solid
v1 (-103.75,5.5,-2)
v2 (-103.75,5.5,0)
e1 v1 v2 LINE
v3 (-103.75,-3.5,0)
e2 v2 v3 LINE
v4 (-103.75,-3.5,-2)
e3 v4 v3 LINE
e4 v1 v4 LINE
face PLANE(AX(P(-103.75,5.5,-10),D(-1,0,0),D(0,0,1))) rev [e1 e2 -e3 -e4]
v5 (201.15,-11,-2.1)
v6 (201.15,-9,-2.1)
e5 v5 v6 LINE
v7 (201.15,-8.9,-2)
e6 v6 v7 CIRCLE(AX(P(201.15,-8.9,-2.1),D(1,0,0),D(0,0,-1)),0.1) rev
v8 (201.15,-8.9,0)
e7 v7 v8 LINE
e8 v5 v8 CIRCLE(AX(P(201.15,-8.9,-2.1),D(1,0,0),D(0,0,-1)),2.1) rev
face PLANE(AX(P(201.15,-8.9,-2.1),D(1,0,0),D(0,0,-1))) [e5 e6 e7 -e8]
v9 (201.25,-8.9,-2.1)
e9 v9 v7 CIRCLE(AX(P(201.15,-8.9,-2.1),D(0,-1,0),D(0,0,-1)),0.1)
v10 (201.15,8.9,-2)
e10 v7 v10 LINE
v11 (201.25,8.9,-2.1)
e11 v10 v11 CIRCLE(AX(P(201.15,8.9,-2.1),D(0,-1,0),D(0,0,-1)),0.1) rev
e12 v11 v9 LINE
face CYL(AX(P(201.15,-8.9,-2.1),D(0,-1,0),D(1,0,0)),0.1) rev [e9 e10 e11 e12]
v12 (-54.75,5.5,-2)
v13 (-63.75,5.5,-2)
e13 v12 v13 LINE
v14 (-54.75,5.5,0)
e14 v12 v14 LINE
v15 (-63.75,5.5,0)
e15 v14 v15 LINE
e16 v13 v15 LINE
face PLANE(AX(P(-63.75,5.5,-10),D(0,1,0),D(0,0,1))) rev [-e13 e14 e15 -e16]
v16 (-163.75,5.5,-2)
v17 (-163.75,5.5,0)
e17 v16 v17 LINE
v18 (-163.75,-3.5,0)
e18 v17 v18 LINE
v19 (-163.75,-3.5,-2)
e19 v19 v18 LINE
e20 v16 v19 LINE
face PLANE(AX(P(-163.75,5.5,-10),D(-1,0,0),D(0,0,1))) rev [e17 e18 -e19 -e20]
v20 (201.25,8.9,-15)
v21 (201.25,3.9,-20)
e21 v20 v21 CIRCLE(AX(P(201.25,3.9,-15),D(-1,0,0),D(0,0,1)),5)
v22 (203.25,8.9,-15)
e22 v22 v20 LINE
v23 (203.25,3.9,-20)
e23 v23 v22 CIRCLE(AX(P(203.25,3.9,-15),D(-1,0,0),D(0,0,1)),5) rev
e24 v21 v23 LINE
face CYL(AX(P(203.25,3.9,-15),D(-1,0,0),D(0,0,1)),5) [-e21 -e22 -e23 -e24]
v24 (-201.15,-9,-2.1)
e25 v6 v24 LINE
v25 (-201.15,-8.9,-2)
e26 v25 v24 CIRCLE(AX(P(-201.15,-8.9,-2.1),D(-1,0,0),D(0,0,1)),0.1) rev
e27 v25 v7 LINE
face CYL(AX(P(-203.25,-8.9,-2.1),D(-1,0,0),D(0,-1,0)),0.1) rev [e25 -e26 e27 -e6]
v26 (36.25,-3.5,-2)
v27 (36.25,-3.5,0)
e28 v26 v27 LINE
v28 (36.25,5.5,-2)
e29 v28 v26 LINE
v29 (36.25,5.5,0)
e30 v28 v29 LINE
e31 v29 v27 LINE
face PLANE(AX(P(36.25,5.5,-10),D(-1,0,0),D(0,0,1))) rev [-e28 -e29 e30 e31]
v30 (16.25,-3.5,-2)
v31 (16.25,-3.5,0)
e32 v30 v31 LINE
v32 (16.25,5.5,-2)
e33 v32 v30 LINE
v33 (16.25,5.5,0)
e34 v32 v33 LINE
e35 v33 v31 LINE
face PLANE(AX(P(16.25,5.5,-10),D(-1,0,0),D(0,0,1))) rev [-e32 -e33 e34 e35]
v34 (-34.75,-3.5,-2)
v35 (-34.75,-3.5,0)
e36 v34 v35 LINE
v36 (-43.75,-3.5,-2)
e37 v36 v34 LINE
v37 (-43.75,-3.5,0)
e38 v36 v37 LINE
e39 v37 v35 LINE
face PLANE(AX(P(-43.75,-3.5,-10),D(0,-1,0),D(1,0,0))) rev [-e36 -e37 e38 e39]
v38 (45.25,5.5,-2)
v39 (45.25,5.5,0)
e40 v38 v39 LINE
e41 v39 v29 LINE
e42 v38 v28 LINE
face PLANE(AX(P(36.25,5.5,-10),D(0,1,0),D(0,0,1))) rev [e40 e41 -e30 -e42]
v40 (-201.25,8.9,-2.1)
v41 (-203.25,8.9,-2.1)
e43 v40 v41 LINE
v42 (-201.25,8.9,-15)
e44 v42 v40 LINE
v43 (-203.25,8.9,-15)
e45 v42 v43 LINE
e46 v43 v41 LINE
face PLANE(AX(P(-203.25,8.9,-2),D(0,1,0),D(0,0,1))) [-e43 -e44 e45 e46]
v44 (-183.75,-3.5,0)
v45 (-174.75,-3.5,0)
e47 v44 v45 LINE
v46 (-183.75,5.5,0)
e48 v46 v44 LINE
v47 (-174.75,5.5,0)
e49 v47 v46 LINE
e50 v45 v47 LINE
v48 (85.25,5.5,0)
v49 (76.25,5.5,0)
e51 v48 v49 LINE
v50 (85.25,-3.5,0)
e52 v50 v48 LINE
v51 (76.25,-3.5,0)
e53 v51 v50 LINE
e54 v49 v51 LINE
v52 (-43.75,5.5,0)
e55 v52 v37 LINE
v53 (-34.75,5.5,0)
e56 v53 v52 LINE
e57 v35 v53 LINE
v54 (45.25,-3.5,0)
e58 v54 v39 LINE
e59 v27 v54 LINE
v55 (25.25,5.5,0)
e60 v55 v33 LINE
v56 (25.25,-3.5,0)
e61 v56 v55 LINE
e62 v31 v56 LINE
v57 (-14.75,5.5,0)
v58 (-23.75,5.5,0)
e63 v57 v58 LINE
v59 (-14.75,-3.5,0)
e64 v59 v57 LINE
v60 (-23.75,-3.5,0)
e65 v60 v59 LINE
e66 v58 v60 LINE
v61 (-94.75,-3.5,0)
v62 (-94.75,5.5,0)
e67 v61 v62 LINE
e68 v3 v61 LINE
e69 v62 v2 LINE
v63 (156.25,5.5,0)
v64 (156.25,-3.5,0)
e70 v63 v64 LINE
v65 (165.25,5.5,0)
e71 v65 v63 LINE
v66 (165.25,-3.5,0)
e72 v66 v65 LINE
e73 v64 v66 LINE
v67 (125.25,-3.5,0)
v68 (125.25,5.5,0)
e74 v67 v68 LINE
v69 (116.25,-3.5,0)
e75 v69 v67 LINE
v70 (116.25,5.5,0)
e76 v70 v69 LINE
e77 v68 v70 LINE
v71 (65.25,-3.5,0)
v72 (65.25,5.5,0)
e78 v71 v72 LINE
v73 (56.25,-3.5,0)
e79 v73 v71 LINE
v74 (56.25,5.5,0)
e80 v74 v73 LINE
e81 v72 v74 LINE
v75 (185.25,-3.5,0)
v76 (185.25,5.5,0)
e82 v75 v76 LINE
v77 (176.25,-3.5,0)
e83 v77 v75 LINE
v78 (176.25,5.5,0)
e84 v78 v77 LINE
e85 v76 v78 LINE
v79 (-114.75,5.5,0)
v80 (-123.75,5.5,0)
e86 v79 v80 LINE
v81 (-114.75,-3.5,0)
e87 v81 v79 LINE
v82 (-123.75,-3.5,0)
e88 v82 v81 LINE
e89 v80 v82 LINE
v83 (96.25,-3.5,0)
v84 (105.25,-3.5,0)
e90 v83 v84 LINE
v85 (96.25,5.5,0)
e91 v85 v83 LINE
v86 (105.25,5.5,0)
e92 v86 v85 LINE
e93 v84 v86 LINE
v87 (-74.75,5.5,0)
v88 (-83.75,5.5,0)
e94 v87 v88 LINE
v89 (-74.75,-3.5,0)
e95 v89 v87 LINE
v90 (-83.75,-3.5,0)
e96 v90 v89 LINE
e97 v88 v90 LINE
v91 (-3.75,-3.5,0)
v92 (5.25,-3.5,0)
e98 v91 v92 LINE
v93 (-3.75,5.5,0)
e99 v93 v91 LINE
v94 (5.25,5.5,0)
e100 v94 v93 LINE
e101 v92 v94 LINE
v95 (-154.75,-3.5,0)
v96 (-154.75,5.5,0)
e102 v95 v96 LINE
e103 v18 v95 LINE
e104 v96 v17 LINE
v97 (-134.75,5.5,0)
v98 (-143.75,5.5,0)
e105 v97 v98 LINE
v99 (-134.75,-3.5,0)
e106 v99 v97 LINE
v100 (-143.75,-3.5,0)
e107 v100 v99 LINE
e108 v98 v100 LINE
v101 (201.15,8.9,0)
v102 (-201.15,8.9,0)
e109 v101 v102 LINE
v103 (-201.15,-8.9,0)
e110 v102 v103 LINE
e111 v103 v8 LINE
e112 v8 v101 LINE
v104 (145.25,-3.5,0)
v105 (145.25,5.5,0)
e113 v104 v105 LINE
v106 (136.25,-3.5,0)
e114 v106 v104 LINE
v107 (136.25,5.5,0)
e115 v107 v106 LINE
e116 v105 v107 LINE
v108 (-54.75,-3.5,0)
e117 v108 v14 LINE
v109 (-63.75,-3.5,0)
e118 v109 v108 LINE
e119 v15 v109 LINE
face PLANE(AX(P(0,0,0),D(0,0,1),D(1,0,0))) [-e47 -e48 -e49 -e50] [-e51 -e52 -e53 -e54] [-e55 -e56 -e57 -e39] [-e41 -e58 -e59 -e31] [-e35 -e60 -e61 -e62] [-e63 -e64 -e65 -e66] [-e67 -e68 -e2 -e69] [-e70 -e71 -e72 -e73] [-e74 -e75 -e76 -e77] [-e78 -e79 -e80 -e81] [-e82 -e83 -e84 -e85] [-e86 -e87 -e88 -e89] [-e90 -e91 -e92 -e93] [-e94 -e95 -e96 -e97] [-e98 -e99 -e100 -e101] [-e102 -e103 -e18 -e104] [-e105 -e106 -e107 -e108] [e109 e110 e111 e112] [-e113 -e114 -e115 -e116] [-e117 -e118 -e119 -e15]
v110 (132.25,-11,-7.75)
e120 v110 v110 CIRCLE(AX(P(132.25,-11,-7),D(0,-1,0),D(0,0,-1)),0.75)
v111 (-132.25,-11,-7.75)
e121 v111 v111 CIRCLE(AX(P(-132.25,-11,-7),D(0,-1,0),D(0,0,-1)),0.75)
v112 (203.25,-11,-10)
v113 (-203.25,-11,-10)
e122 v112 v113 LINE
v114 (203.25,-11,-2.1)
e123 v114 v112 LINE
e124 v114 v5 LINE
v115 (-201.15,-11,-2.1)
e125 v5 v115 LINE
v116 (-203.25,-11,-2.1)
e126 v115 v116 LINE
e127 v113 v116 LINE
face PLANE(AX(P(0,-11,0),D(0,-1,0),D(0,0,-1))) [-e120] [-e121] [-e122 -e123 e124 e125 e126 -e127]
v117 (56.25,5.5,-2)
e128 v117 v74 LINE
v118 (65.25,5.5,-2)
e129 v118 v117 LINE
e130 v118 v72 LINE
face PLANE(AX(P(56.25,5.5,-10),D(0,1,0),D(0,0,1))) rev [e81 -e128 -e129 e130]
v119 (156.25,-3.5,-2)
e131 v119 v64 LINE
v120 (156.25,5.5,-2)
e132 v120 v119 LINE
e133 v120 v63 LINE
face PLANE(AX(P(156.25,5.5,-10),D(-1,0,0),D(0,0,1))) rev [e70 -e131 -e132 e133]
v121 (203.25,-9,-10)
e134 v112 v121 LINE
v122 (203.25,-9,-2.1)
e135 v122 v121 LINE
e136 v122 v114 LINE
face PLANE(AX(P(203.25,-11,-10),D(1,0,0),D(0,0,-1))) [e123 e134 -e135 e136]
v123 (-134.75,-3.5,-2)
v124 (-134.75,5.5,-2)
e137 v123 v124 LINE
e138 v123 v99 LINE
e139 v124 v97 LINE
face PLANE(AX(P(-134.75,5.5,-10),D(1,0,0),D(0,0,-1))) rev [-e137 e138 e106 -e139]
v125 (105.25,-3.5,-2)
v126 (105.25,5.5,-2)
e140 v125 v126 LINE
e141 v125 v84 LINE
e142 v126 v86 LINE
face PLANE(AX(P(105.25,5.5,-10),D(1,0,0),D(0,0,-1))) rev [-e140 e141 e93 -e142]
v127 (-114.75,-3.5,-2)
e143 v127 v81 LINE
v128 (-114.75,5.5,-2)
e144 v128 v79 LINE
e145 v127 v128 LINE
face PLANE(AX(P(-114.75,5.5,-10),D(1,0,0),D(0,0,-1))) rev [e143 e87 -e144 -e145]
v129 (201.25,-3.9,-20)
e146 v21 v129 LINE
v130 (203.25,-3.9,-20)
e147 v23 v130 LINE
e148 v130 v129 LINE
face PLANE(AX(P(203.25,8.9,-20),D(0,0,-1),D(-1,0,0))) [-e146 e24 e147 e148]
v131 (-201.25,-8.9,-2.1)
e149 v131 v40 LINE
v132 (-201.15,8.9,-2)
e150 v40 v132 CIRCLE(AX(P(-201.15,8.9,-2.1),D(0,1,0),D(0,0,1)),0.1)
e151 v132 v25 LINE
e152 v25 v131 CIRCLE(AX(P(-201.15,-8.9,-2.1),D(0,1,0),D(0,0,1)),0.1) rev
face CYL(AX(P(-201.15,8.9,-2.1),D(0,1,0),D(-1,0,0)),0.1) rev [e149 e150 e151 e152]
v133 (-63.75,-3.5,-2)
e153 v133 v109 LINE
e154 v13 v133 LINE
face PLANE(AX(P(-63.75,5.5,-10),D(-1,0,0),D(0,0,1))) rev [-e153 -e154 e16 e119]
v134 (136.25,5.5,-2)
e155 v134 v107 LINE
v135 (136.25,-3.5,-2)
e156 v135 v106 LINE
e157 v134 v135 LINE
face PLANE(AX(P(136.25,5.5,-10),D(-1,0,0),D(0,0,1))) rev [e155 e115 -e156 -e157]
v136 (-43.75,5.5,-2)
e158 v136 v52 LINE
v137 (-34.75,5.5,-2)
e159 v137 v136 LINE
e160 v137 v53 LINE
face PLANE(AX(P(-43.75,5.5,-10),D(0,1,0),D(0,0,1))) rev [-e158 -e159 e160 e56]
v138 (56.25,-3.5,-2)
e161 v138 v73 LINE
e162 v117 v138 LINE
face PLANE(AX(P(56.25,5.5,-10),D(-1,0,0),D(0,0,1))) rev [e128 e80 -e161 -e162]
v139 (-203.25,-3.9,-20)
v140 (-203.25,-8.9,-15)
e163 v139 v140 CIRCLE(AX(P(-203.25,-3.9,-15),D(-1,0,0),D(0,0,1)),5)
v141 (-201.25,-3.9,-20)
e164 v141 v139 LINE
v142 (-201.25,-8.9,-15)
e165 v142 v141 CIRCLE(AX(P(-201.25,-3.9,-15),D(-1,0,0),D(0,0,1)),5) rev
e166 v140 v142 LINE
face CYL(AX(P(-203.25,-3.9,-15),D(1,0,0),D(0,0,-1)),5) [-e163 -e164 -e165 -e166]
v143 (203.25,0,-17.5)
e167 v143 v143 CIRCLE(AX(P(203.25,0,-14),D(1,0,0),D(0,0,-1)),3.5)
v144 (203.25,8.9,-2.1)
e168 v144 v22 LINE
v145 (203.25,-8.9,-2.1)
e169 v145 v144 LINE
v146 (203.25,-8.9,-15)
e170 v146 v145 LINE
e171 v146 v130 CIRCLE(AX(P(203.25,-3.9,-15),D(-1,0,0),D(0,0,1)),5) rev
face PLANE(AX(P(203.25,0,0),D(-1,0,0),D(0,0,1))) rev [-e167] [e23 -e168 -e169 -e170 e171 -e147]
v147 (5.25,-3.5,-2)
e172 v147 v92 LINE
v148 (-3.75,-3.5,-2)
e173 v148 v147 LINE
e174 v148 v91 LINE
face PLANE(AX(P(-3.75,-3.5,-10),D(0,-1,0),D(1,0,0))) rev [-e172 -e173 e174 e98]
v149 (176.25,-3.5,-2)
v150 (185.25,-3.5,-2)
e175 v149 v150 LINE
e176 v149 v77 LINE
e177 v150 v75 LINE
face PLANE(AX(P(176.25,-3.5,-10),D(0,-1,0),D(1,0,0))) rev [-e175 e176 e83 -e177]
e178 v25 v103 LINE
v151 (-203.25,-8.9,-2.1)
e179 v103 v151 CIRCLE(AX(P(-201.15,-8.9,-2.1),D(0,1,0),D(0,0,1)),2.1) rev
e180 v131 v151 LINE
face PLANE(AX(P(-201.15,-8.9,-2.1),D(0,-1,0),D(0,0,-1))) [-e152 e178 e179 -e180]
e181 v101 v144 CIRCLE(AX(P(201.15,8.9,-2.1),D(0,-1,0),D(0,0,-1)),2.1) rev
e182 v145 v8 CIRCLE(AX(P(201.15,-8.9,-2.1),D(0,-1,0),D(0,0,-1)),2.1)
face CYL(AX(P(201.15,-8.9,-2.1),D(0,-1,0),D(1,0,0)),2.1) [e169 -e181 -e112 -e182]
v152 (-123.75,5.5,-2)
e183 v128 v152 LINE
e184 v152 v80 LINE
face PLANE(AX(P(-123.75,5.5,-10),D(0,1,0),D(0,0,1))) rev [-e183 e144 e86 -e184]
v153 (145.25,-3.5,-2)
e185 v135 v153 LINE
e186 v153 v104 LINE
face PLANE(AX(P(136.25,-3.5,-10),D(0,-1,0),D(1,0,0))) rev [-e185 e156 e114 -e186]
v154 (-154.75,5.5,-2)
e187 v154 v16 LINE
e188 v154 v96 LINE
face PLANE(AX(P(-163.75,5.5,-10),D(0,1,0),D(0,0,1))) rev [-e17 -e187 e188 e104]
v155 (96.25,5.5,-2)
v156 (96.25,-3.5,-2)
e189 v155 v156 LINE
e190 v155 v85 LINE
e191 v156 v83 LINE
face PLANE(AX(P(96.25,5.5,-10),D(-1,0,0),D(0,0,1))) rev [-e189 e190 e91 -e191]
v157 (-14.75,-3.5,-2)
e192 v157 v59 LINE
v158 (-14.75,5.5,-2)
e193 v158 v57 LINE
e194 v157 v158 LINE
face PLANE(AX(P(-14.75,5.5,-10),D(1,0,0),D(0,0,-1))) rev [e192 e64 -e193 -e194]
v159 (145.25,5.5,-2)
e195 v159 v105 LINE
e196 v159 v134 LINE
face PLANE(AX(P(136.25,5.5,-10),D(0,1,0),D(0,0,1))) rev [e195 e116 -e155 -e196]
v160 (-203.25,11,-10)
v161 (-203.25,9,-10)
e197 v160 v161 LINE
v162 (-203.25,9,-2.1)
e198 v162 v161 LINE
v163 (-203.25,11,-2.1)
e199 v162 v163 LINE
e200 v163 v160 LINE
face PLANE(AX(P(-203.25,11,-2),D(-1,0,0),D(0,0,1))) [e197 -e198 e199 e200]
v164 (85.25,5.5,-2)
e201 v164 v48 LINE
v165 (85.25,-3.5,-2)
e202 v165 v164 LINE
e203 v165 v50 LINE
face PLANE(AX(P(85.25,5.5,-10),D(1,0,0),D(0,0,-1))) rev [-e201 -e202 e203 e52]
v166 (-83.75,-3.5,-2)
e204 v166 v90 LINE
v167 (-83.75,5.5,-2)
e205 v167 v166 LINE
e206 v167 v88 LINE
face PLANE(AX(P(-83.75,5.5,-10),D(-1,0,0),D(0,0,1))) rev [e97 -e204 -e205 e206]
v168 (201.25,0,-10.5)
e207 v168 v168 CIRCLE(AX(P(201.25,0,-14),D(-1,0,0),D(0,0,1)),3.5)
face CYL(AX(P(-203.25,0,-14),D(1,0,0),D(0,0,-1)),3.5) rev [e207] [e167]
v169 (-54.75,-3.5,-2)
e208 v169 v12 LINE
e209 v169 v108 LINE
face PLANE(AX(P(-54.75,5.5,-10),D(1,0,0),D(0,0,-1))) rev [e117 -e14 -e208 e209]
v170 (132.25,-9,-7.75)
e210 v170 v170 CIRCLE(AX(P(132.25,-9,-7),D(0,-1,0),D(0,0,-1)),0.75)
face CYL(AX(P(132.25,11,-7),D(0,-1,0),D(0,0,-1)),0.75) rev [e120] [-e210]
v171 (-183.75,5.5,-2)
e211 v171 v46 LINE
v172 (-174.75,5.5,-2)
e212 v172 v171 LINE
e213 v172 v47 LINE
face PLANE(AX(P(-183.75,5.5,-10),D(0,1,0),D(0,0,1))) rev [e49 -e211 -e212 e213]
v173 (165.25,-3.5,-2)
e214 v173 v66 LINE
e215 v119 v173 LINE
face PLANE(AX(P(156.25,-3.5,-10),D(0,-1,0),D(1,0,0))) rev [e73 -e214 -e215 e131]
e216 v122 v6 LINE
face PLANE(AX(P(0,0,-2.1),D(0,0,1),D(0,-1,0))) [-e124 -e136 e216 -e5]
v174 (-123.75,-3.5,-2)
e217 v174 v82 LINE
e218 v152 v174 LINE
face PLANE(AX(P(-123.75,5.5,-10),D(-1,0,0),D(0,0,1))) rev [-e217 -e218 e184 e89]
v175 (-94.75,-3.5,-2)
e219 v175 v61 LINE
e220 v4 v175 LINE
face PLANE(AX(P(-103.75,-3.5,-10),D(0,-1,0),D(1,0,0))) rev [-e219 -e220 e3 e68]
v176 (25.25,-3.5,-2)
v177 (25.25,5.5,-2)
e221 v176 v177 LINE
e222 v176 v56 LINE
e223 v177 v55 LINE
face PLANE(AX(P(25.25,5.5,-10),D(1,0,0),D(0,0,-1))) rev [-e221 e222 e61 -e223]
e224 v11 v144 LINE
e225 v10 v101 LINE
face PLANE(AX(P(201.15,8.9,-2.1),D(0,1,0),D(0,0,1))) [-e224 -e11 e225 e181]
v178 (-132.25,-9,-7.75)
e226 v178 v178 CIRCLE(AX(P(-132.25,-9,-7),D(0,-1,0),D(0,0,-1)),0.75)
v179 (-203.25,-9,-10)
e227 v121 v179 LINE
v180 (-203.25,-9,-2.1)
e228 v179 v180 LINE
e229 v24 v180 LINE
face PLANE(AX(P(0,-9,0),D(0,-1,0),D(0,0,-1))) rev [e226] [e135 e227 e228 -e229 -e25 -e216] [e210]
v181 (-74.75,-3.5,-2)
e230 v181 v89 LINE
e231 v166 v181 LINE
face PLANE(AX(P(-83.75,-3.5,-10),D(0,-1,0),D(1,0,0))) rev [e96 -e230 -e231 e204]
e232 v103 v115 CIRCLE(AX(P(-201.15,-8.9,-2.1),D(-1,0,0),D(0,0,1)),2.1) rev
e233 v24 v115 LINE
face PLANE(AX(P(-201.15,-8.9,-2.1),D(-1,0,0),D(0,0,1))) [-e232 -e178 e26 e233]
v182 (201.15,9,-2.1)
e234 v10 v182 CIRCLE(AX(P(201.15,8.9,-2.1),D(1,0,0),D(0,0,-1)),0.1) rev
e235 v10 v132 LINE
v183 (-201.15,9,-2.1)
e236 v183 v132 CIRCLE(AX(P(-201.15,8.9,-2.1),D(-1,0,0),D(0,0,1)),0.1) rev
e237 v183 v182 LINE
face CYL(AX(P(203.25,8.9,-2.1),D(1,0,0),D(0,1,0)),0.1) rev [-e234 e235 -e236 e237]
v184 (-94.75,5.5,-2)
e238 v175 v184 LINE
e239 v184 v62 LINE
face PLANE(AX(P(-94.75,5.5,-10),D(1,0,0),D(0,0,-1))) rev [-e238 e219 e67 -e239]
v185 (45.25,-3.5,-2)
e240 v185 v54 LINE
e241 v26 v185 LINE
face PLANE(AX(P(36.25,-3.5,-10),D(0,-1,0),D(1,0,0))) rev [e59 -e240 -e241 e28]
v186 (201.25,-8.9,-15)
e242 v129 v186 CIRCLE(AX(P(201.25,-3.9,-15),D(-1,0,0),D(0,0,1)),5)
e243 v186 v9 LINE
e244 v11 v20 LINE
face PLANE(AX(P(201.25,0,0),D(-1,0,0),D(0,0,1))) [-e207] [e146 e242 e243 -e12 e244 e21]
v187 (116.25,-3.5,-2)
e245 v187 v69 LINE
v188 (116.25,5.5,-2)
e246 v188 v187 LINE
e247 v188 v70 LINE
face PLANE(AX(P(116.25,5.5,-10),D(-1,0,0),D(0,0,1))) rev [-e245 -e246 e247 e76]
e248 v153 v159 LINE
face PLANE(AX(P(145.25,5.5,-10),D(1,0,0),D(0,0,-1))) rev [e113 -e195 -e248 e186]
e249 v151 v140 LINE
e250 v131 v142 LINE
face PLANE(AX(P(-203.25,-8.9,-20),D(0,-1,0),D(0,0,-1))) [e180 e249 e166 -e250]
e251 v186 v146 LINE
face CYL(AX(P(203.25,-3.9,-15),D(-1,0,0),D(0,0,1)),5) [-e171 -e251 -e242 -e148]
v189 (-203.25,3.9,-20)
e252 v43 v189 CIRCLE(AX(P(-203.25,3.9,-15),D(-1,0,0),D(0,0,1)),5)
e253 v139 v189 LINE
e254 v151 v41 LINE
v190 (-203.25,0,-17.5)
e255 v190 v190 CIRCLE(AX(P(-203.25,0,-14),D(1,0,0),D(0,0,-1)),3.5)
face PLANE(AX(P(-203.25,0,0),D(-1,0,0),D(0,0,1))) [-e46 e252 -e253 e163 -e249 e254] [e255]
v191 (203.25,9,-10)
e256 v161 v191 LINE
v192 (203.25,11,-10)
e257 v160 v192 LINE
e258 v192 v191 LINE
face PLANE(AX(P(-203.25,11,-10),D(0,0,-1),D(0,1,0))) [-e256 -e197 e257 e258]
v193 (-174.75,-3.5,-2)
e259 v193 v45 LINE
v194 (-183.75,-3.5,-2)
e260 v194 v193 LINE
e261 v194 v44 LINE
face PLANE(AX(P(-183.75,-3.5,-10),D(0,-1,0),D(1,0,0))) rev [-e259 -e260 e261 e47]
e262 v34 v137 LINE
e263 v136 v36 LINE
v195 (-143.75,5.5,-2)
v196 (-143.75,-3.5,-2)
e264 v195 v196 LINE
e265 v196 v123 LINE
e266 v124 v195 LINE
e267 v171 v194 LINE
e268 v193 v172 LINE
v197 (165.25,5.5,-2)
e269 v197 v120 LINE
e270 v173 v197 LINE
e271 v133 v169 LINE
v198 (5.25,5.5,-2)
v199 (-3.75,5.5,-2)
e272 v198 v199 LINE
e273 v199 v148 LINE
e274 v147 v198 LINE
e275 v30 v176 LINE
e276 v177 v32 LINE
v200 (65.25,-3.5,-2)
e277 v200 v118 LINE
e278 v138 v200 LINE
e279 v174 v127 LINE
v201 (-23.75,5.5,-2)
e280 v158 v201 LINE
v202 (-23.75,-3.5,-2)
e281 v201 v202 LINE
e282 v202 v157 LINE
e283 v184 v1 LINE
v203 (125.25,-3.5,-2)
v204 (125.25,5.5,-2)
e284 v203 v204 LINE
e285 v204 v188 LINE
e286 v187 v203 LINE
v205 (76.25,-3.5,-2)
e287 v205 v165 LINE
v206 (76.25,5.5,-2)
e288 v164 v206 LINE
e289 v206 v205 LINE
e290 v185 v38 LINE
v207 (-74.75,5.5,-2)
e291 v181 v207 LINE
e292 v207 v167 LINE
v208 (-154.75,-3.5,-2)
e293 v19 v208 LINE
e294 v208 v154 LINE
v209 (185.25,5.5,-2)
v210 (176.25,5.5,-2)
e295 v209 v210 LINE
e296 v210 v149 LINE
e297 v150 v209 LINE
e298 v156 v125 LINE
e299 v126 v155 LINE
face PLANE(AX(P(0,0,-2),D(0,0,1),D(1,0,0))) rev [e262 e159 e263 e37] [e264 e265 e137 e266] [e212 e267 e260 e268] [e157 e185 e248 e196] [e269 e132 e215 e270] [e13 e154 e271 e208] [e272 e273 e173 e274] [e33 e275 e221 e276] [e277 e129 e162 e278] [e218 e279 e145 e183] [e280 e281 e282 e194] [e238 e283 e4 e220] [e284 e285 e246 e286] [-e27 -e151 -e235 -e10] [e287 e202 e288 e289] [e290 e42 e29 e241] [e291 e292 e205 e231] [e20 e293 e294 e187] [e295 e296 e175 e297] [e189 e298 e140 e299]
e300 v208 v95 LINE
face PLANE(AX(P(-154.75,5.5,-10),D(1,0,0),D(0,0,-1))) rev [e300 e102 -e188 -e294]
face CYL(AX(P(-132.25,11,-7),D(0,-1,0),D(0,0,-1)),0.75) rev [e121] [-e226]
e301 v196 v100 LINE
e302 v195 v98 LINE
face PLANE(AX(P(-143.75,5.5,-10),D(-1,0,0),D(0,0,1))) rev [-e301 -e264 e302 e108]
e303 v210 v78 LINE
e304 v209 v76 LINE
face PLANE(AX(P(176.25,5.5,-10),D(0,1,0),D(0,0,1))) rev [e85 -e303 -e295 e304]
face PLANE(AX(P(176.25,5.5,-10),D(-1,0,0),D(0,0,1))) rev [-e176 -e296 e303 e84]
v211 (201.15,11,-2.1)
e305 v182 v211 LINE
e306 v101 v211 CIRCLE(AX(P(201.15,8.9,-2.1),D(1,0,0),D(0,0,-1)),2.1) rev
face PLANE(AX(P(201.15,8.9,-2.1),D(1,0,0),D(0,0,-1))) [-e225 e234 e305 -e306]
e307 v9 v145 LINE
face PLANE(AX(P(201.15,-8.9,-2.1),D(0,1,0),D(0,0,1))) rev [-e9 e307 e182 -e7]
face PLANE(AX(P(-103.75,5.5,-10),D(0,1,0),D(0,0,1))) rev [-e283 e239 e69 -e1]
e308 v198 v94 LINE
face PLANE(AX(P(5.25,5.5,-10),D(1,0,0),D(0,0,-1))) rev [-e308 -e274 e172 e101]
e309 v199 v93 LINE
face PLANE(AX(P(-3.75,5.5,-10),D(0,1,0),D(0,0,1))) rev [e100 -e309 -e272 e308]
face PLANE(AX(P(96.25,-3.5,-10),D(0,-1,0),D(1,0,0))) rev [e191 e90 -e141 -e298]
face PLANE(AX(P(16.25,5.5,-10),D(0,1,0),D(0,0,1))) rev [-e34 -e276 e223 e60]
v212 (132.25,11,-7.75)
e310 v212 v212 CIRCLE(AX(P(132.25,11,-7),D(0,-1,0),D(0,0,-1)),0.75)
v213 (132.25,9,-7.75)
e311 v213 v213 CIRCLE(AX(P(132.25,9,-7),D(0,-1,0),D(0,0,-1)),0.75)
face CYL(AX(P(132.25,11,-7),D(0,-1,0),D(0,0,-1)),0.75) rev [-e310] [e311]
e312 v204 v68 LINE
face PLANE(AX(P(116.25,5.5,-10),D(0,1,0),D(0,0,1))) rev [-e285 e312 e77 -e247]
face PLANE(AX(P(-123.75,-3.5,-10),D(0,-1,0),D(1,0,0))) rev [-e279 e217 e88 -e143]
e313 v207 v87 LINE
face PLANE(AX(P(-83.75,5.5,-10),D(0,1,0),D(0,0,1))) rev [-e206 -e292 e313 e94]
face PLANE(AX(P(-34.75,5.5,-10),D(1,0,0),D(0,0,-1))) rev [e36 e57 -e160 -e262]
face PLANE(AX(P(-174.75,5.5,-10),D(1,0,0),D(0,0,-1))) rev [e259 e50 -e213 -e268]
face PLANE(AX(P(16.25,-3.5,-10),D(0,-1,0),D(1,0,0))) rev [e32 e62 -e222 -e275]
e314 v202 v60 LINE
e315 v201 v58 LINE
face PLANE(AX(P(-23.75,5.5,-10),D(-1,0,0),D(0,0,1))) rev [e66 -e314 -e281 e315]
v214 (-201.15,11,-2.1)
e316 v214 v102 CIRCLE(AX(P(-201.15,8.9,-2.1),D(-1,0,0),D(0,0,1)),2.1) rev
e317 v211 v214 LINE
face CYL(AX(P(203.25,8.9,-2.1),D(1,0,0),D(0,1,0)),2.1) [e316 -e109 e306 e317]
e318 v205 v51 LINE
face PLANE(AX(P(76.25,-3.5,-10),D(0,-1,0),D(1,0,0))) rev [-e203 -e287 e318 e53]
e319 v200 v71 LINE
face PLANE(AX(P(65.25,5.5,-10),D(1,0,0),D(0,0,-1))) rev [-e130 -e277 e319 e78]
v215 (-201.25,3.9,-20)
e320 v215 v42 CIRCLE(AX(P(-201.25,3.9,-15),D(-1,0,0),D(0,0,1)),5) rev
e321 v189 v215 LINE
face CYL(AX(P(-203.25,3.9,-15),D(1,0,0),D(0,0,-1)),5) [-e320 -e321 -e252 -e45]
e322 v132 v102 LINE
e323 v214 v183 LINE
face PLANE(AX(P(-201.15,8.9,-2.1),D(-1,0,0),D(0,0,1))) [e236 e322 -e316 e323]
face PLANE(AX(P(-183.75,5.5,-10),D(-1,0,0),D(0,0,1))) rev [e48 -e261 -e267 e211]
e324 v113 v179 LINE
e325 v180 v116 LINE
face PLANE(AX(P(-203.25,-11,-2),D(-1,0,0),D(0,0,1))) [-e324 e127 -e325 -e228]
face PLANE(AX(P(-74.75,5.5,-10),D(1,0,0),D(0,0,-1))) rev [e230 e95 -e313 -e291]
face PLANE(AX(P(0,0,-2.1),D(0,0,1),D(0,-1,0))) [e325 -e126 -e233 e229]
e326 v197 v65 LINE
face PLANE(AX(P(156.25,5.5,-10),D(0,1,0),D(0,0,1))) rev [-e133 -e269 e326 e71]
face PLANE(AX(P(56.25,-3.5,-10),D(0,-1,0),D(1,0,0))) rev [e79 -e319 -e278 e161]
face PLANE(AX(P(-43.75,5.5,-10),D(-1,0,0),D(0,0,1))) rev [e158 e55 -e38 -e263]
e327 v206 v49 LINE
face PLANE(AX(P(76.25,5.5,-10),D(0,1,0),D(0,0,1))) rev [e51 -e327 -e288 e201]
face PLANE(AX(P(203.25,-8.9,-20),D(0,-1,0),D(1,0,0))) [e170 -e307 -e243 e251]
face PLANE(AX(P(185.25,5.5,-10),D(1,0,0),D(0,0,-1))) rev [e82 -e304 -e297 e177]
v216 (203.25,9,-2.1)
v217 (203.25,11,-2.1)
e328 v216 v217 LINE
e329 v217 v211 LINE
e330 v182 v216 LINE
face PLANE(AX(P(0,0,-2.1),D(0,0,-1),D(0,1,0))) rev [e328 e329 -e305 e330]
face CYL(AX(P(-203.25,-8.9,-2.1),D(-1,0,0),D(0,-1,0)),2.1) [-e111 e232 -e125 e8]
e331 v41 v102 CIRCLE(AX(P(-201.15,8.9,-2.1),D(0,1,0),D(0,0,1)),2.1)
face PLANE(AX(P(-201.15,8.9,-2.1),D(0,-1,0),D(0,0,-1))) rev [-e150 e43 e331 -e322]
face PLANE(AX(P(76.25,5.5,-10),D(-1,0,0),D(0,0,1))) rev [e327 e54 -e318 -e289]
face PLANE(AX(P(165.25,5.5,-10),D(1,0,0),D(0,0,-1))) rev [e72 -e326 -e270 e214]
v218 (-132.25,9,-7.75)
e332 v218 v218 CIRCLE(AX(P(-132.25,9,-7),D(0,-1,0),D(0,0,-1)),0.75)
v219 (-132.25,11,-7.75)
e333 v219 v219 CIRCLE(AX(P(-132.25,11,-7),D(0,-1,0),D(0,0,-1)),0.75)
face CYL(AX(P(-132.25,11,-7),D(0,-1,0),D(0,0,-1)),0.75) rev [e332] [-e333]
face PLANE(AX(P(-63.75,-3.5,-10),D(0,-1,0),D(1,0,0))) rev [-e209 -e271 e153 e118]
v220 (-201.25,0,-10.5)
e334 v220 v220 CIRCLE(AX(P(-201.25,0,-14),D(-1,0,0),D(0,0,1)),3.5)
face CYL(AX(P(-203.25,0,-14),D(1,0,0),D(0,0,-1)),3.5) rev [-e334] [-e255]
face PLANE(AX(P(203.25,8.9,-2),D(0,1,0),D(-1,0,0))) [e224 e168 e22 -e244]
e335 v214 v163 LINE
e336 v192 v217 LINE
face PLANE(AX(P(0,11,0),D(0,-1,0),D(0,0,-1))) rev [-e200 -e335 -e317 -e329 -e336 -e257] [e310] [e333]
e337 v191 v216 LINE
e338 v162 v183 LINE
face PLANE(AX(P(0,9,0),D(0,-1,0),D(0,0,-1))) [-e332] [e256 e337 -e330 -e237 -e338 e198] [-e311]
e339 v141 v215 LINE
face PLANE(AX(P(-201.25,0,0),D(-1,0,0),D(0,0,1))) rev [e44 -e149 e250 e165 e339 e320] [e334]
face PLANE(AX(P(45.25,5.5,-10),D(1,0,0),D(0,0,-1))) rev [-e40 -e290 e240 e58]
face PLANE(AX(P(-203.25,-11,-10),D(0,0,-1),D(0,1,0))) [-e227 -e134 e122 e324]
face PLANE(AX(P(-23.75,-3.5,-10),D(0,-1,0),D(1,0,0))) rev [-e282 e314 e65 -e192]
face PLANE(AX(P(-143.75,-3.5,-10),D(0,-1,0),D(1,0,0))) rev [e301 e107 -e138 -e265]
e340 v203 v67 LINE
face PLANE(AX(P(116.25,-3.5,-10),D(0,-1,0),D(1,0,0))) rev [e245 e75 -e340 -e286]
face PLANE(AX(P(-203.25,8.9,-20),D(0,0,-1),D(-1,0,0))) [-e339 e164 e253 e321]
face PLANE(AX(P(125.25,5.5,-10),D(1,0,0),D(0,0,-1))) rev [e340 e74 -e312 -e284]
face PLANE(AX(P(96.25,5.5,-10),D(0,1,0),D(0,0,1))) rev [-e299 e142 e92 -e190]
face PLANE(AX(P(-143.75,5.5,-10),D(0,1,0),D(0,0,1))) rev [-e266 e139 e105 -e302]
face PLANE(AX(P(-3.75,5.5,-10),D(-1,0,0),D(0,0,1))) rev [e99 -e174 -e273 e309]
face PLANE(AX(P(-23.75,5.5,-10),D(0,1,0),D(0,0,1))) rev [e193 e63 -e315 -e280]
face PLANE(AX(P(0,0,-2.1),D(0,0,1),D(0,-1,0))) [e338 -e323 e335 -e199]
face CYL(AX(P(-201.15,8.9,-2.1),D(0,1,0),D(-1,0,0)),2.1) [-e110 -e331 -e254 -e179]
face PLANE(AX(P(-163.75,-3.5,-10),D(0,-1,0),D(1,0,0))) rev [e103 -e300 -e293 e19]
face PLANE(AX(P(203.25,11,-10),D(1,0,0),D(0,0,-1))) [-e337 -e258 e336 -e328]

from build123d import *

# Parameters (mm, degrees)
SKETCH_1_W                         = 406.5
SKETCH_1_H                         = 22
SM_BASE_FLANGE_1_DEPTH             = 2
SM_EDGE_FLANGE_1_STRIP_W           = 8.2
SM_EDGE_FLANGE_1_STRIP_H           = 2
SM_EDGE_FLANGE_1_STRIP_CUT_DEPTH   = 406.5
SM_EDGE_FLANGE_1_STRIP_2_W         = 8.2
SM_EDGE_FLANGE_1_STRIP_2_H         = 2
SM_EDGE_FLANGE_1_STRIP_CUT_2_DEPTH = 406.5
SM_EDGE_FLANGE_1_DEPTH             = 406.5
SM_EDGE_FLANGE_1_BEND_DEPTH        = 406.5
SM_START                           = -11
SM_EDGE_FLANGE_2_DEPTH             = 22
SM_EDGE_FLANGE_2_2_DEPTH           = 2.1
SM_START_2                         = 8.9
SM_EDGE_FLANGE_2_3_DEPTH           = 2.1
SM_START_3                         = -8.9
SM_EDGE_FLANGE_2_4_DEPTH           = 17.8
SKETCH_18_W                        = 9
SKETCH_18_H                        = 9
CUT_EXTRUDE_1_DEPTH                = 10
PATTERN_LINEAR_1_COUNT             = 19
PATTERN_LINEAR_1_PITCH             = 20
FILLET_1_R                         = 5
SKETCH_19_R                        = 3.5
CUT_EXTRUDE_2_DEPTH                = 408.140332072
CUT_EXTRUDE_3_DEPTH                = 206.413150747
CUT_EXTRUDE_3_DEPTH_BACK           = 206.413150747
SKETCH_20_R                        = 0.75


# Read off the part's stored shape, not the designer's step: 边线-法兰2
# Sheet-metal steps are written as plain solids
with BuildPart() as part:
    # Sketch 1 → 基体-法兰1 (new body)
    with BuildSketch(Plane.XY):
        Rectangle(SKETCH_1_W, SKETCH_1_H)
    extrude(amount=-SM_BASE_FLANGE_1_DEPTH)

    # 边线-法兰1 strip (across the edge) → 边线-法兰1 strip cut (cut)
    with BuildSketch(Plane(origin=(203.25, -11, -2), x_dir=(0, 1, 0), z_dir=(-1, 0, 0))):
        with Locations((-2, -1)):
            Rectangle(SM_EDGE_FLANGE_1_STRIP_W, SM_EDGE_FLANGE_1_STRIP_H)
    extrude(amount=SM_EDGE_FLANGE_1_STRIP_CUT_DEPTH, mode=Mode.SUBTRACT)

    # 边线-法兰1 strip 2 (across the edge) → 边线-法兰1 strip cut 2 (cut)
    with BuildSketch(Plane(origin=(-203.25, 11, -2), x_dir=(0, -1, 0), z_dir=(1, 0, 0))):
        with Locations((-2, -1)):
            Rectangle(SM_EDGE_FLANGE_1_STRIP_2_W, SM_EDGE_FLANGE_1_STRIP_2_H)
    extrude(amount=SM_EDGE_FLANGE_1_STRIP_CUT_2_DEPTH, mode=Mode.SUBTRACT)

    # 边线-法兰1 section (across the edge) → 边线-法兰1 (add)
    with BuildSketch(Plane(origin=(203.25, -11, -2), x_dir=(0, 1, 0), z_dir=(-1, 0, 0))):
        with BuildLine():
            Line((0, 0.1), (0, 8))
            Line((0, 8), (2, 8))
            Line((2, 8), (2, 0.1))
            ThreePointArc((2, 0.1), (2.029289322, 0.029289322), (2.1, 0))
            Line((2.1, 0), (2.1, -2))
            ThreePointArc((2.1, -2), (0.61507576, -1.38492424), (0, 0.1))
        make_face()
    extrude(amount=SM_EDGE_FLANGE_1_DEPTH)

    # 边线-法兰1 section 2 (across the edge) → 边线-法兰1 bend (add)
    with BuildSketch(Plane(origin=(-203.25, 11, -2), x_dir=(0, -1, 0), z_dir=(1, 0, 0))):
        with BuildLine():
            Line((0, 0.1), (0, 8))
            Line((0, 8), (2, 8))
            Line((2, 8), (2, 0.1))
            ThreePointArc((2, 0.1), (2.029289322, 0.029289322), (2.1, 0))
            Line((2.1, 0), (2.1, -2))
            ThreePointArc((2.1, -2), (0.61507576, -1.38492424), (0, 0.1))
        make_face()
    extrude(amount=SM_EDGE_FLANGE_1_BEND_DEPTH)

    # 边线-法兰2 outline → 边线-法兰2 (cut)
    with BuildSketch(Plane(origin=(0, 0, 0), x_dir=(1, 0, 0), z_dir=(0, 1, 0)).offset(SM_START)):
        with BuildLine():
            Line((201.25, 2.1), (201.15, 2.1))
            Line((201.15, 2.1), (201.15, 2))
            ThreePointArc((201.15, 2), (201.220710678, 2.029289322), (201.25, 2.1))
        make_face()
        with BuildLine():
            ThreePointArc((203.25, 2.1), (202.63492424, 0.61507576), (201.15, 0))
            Line((201.15, 0), (203.25, 0))
            Line((203.25, 0), (203.25, 2.1))
        make_face()
        with BuildLine():
            ThreePointArc((-201.25, 2.1), (-201.220710678, 2.029289322), (-201.15, 2))
            Line((-201.15, 2), (-201.15, 2.1))
            Line((-201.15, 2.1), (-201.25, 2.1))
        make_face()
        with BuildLine():
            Line((-203.25, 0), (-201.15, 0))
            ThreePointArc((-201.15, 0), (-202.63492424, 0.61507576), (-203.25, 2.1))
            Line((-203.25, 2.1), (-203.25, 0))
        make_face()
    extrude(amount=SM_EDGE_FLANGE_2_DEPTH, mode=Mode.SUBTRACT)

    # Sm Edge Flange 2 2 outline → Sm Edge Flange 2 2 (cut)
    with BuildSketch(Plane(origin=(0, 0, 0), x_dir=(1, 0, 0), z_dir=(0, 1, 0)).offset(SM_START)):
        with BuildLine():
            Line((203.25, 2.1), (201.25, 2.1))
            ThreePointArc((201.25, 2.1), (201.220710678, 2.029289322), (201.15, 2))
            Line((201.15, 2), (201.15, 0))
            ThreePointArc((201.15, 0), (202.63492424, 0.61507576), (203.25, 2.1))
        make_face()
        with BuildLine():
            ThreePointArc((-203.25, 2.1), (-202.63492424, 0.61507576), (-201.15, 0))
            Line((-201.15, 0), (-201.15, 2))
            ThreePointArc((-201.15, 2), (-201.220710678, 2.029289322), (-201.25, 2.1))
            Line((-201.25, 2.1), (-203.25, 2.1))
        make_face()
    extrude(amount=SM_EDGE_FLANGE_2_2_DEPTH, mode=Mode.SUBTRACT)

    # Sm Edge Flange 2 3 outline → Sm Edge Flange 2 3 (cut)
    with BuildSketch(Plane(origin=(0, 0, 0), x_dir=(1, 0, 0), z_dir=(0, 1, 0)).offset(SM_START_2)):
        with BuildLine():
            Line((203.25, 2.1), (201.25, 2.1))
            ThreePointArc((201.25, 2.1), (201.220710678, 2.029289322), (201.15, 2))
            Line((201.15, 2), (201.15, 0))
            ThreePointArc((201.15, 0), (202.63492424, 0.61507576), (203.25, 2.1))
        make_face()
        with BuildLine():
            ThreePointArc((-203.25, 2.1), (-202.63492424, 0.61507576), (-201.15, 0))
            Line((-201.15, 0), (-201.15, 2))
            ThreePointArc((-201.15, 2), (-201.220710678, 2.029289322), (-201.25, 2.1))
            Line((-201.25, 2.1), (-203.25, 2.1))
        make_face()
    extrude(amount=SM_EDGE_FLANGE_2_3_DEPTH, mode=Mode.SUBTRACT)

    # Sm Edge Flange 2 4 outline → Sm Edge Flange 2 4 (add)
    with BuildSketch(Plane(origin=(0, 0, 0), x_dir=(1, 0, 0), z_dir=(0, 1, 0)).offset(SM_START_3)):
        with BuildLine():
            Line((201.25, 20), (201.25, 2.1))
            ThreePointArc((201.25, 2.1), (201.220710678, 2.029289322), (201.15, 2))
            Line((201.15, 2), (203.247617696, 2))
            ThreePointArc((203.247617696, 2), (203.24940434, 2.049985814), (203.25, 2.1))
            Line((203.25, 2.1), (203.25, 20))
            Line((203.25, 20), (201.25, 20))
        make_face()
        with BuildLine():
            Line((-203.247617696, 2), (-201.15, 2))
            ThreePointArc((-201.15, 2), (-201.220710678, 2.029289322), (-201.25, 2.1))
            Line((-201.25, 2.1), (-201.25, 20))
            Line((-201.25, 20), (-203.25, 20))
            Line((-203.25, 20), (-203.25, 2.1))
            ThreePointArc((-203.25, 2.1), (-203.24940434, 2.049985814), (-203.247617696, 2))
        make_face()
    extrude(amount=SM_EDGE_FLANGE_2_4_DEPTH)

    # 草图18 → 切除-拉伸1 (cut)
    with BuildSketch(Plane.XY):
        with Locations((-179.25, 1)):
            Rectangle(SKETCH_18_W, SKETCH_18_H)
    cut_extrude_1 = extrude(amount=-CUT_EXTRUDE_1_DEPTH, mode=Mode.SUBTRACT)

    # 阵列(线性)1: 切除-拉伸1 ×19
    with Locations(*[(i * PATTERN_LINEAR_1_PITCH, 0, 0) for i in range(1, PATTERN_LINEAR_1_COUNT)]):
        add(cut_extrude_1, mode=Mode.SUBTRACT)

    # 圆角1
    fillet_1_edges = [part.edges().sort_by_distance(p)[0] for p in [
        (-202.25, -8.9, -20),
        (-202.25, 8.9, -20),
        (202.25, 8.9, -20),
        (202.25, -8.9, -20),
    ]]
    fillet(fillet_1_edges, radius=FILLET_1_R)

    # 草图19 → 切除-拉伸2 (cut, through all)
    with BuildSketch(Plane(origin=(203.25, 0, 0), x_dir=(0, 0, -1), z_dir=(1, 0, 0))):
        with Locations((14, 0)):
            Circle(SKETCH_19_R)
    extrude(amount=-CUT_EXTRUDE_2_DEPTH, mode=Mode.SUBTRACT)

    # 草图20 → 切除-拉伸3 (cut, two sides: drawn at the far end of the back side and taken through both)
    with BuildSketch(Plane.XZ.offset(11).offset(-CUT_EXTRUDE_3_DEPTH_BACK)):
        with Locations(Location((132.25, -7, 0), (0, 0, 270))):
            Circle(SKETCH_20_R)
        with Locations(Location((-132.25, -7, 0), (0, 0, 270))):
            Circle(SKETCH_20_R)
    extrude(amount=CUT_EXTRUDE_3_DEPTH + CUT_EXTRUDE_3_DEPTH_BACK, mode=Mode.SUBTRACT)


solid = part.part
